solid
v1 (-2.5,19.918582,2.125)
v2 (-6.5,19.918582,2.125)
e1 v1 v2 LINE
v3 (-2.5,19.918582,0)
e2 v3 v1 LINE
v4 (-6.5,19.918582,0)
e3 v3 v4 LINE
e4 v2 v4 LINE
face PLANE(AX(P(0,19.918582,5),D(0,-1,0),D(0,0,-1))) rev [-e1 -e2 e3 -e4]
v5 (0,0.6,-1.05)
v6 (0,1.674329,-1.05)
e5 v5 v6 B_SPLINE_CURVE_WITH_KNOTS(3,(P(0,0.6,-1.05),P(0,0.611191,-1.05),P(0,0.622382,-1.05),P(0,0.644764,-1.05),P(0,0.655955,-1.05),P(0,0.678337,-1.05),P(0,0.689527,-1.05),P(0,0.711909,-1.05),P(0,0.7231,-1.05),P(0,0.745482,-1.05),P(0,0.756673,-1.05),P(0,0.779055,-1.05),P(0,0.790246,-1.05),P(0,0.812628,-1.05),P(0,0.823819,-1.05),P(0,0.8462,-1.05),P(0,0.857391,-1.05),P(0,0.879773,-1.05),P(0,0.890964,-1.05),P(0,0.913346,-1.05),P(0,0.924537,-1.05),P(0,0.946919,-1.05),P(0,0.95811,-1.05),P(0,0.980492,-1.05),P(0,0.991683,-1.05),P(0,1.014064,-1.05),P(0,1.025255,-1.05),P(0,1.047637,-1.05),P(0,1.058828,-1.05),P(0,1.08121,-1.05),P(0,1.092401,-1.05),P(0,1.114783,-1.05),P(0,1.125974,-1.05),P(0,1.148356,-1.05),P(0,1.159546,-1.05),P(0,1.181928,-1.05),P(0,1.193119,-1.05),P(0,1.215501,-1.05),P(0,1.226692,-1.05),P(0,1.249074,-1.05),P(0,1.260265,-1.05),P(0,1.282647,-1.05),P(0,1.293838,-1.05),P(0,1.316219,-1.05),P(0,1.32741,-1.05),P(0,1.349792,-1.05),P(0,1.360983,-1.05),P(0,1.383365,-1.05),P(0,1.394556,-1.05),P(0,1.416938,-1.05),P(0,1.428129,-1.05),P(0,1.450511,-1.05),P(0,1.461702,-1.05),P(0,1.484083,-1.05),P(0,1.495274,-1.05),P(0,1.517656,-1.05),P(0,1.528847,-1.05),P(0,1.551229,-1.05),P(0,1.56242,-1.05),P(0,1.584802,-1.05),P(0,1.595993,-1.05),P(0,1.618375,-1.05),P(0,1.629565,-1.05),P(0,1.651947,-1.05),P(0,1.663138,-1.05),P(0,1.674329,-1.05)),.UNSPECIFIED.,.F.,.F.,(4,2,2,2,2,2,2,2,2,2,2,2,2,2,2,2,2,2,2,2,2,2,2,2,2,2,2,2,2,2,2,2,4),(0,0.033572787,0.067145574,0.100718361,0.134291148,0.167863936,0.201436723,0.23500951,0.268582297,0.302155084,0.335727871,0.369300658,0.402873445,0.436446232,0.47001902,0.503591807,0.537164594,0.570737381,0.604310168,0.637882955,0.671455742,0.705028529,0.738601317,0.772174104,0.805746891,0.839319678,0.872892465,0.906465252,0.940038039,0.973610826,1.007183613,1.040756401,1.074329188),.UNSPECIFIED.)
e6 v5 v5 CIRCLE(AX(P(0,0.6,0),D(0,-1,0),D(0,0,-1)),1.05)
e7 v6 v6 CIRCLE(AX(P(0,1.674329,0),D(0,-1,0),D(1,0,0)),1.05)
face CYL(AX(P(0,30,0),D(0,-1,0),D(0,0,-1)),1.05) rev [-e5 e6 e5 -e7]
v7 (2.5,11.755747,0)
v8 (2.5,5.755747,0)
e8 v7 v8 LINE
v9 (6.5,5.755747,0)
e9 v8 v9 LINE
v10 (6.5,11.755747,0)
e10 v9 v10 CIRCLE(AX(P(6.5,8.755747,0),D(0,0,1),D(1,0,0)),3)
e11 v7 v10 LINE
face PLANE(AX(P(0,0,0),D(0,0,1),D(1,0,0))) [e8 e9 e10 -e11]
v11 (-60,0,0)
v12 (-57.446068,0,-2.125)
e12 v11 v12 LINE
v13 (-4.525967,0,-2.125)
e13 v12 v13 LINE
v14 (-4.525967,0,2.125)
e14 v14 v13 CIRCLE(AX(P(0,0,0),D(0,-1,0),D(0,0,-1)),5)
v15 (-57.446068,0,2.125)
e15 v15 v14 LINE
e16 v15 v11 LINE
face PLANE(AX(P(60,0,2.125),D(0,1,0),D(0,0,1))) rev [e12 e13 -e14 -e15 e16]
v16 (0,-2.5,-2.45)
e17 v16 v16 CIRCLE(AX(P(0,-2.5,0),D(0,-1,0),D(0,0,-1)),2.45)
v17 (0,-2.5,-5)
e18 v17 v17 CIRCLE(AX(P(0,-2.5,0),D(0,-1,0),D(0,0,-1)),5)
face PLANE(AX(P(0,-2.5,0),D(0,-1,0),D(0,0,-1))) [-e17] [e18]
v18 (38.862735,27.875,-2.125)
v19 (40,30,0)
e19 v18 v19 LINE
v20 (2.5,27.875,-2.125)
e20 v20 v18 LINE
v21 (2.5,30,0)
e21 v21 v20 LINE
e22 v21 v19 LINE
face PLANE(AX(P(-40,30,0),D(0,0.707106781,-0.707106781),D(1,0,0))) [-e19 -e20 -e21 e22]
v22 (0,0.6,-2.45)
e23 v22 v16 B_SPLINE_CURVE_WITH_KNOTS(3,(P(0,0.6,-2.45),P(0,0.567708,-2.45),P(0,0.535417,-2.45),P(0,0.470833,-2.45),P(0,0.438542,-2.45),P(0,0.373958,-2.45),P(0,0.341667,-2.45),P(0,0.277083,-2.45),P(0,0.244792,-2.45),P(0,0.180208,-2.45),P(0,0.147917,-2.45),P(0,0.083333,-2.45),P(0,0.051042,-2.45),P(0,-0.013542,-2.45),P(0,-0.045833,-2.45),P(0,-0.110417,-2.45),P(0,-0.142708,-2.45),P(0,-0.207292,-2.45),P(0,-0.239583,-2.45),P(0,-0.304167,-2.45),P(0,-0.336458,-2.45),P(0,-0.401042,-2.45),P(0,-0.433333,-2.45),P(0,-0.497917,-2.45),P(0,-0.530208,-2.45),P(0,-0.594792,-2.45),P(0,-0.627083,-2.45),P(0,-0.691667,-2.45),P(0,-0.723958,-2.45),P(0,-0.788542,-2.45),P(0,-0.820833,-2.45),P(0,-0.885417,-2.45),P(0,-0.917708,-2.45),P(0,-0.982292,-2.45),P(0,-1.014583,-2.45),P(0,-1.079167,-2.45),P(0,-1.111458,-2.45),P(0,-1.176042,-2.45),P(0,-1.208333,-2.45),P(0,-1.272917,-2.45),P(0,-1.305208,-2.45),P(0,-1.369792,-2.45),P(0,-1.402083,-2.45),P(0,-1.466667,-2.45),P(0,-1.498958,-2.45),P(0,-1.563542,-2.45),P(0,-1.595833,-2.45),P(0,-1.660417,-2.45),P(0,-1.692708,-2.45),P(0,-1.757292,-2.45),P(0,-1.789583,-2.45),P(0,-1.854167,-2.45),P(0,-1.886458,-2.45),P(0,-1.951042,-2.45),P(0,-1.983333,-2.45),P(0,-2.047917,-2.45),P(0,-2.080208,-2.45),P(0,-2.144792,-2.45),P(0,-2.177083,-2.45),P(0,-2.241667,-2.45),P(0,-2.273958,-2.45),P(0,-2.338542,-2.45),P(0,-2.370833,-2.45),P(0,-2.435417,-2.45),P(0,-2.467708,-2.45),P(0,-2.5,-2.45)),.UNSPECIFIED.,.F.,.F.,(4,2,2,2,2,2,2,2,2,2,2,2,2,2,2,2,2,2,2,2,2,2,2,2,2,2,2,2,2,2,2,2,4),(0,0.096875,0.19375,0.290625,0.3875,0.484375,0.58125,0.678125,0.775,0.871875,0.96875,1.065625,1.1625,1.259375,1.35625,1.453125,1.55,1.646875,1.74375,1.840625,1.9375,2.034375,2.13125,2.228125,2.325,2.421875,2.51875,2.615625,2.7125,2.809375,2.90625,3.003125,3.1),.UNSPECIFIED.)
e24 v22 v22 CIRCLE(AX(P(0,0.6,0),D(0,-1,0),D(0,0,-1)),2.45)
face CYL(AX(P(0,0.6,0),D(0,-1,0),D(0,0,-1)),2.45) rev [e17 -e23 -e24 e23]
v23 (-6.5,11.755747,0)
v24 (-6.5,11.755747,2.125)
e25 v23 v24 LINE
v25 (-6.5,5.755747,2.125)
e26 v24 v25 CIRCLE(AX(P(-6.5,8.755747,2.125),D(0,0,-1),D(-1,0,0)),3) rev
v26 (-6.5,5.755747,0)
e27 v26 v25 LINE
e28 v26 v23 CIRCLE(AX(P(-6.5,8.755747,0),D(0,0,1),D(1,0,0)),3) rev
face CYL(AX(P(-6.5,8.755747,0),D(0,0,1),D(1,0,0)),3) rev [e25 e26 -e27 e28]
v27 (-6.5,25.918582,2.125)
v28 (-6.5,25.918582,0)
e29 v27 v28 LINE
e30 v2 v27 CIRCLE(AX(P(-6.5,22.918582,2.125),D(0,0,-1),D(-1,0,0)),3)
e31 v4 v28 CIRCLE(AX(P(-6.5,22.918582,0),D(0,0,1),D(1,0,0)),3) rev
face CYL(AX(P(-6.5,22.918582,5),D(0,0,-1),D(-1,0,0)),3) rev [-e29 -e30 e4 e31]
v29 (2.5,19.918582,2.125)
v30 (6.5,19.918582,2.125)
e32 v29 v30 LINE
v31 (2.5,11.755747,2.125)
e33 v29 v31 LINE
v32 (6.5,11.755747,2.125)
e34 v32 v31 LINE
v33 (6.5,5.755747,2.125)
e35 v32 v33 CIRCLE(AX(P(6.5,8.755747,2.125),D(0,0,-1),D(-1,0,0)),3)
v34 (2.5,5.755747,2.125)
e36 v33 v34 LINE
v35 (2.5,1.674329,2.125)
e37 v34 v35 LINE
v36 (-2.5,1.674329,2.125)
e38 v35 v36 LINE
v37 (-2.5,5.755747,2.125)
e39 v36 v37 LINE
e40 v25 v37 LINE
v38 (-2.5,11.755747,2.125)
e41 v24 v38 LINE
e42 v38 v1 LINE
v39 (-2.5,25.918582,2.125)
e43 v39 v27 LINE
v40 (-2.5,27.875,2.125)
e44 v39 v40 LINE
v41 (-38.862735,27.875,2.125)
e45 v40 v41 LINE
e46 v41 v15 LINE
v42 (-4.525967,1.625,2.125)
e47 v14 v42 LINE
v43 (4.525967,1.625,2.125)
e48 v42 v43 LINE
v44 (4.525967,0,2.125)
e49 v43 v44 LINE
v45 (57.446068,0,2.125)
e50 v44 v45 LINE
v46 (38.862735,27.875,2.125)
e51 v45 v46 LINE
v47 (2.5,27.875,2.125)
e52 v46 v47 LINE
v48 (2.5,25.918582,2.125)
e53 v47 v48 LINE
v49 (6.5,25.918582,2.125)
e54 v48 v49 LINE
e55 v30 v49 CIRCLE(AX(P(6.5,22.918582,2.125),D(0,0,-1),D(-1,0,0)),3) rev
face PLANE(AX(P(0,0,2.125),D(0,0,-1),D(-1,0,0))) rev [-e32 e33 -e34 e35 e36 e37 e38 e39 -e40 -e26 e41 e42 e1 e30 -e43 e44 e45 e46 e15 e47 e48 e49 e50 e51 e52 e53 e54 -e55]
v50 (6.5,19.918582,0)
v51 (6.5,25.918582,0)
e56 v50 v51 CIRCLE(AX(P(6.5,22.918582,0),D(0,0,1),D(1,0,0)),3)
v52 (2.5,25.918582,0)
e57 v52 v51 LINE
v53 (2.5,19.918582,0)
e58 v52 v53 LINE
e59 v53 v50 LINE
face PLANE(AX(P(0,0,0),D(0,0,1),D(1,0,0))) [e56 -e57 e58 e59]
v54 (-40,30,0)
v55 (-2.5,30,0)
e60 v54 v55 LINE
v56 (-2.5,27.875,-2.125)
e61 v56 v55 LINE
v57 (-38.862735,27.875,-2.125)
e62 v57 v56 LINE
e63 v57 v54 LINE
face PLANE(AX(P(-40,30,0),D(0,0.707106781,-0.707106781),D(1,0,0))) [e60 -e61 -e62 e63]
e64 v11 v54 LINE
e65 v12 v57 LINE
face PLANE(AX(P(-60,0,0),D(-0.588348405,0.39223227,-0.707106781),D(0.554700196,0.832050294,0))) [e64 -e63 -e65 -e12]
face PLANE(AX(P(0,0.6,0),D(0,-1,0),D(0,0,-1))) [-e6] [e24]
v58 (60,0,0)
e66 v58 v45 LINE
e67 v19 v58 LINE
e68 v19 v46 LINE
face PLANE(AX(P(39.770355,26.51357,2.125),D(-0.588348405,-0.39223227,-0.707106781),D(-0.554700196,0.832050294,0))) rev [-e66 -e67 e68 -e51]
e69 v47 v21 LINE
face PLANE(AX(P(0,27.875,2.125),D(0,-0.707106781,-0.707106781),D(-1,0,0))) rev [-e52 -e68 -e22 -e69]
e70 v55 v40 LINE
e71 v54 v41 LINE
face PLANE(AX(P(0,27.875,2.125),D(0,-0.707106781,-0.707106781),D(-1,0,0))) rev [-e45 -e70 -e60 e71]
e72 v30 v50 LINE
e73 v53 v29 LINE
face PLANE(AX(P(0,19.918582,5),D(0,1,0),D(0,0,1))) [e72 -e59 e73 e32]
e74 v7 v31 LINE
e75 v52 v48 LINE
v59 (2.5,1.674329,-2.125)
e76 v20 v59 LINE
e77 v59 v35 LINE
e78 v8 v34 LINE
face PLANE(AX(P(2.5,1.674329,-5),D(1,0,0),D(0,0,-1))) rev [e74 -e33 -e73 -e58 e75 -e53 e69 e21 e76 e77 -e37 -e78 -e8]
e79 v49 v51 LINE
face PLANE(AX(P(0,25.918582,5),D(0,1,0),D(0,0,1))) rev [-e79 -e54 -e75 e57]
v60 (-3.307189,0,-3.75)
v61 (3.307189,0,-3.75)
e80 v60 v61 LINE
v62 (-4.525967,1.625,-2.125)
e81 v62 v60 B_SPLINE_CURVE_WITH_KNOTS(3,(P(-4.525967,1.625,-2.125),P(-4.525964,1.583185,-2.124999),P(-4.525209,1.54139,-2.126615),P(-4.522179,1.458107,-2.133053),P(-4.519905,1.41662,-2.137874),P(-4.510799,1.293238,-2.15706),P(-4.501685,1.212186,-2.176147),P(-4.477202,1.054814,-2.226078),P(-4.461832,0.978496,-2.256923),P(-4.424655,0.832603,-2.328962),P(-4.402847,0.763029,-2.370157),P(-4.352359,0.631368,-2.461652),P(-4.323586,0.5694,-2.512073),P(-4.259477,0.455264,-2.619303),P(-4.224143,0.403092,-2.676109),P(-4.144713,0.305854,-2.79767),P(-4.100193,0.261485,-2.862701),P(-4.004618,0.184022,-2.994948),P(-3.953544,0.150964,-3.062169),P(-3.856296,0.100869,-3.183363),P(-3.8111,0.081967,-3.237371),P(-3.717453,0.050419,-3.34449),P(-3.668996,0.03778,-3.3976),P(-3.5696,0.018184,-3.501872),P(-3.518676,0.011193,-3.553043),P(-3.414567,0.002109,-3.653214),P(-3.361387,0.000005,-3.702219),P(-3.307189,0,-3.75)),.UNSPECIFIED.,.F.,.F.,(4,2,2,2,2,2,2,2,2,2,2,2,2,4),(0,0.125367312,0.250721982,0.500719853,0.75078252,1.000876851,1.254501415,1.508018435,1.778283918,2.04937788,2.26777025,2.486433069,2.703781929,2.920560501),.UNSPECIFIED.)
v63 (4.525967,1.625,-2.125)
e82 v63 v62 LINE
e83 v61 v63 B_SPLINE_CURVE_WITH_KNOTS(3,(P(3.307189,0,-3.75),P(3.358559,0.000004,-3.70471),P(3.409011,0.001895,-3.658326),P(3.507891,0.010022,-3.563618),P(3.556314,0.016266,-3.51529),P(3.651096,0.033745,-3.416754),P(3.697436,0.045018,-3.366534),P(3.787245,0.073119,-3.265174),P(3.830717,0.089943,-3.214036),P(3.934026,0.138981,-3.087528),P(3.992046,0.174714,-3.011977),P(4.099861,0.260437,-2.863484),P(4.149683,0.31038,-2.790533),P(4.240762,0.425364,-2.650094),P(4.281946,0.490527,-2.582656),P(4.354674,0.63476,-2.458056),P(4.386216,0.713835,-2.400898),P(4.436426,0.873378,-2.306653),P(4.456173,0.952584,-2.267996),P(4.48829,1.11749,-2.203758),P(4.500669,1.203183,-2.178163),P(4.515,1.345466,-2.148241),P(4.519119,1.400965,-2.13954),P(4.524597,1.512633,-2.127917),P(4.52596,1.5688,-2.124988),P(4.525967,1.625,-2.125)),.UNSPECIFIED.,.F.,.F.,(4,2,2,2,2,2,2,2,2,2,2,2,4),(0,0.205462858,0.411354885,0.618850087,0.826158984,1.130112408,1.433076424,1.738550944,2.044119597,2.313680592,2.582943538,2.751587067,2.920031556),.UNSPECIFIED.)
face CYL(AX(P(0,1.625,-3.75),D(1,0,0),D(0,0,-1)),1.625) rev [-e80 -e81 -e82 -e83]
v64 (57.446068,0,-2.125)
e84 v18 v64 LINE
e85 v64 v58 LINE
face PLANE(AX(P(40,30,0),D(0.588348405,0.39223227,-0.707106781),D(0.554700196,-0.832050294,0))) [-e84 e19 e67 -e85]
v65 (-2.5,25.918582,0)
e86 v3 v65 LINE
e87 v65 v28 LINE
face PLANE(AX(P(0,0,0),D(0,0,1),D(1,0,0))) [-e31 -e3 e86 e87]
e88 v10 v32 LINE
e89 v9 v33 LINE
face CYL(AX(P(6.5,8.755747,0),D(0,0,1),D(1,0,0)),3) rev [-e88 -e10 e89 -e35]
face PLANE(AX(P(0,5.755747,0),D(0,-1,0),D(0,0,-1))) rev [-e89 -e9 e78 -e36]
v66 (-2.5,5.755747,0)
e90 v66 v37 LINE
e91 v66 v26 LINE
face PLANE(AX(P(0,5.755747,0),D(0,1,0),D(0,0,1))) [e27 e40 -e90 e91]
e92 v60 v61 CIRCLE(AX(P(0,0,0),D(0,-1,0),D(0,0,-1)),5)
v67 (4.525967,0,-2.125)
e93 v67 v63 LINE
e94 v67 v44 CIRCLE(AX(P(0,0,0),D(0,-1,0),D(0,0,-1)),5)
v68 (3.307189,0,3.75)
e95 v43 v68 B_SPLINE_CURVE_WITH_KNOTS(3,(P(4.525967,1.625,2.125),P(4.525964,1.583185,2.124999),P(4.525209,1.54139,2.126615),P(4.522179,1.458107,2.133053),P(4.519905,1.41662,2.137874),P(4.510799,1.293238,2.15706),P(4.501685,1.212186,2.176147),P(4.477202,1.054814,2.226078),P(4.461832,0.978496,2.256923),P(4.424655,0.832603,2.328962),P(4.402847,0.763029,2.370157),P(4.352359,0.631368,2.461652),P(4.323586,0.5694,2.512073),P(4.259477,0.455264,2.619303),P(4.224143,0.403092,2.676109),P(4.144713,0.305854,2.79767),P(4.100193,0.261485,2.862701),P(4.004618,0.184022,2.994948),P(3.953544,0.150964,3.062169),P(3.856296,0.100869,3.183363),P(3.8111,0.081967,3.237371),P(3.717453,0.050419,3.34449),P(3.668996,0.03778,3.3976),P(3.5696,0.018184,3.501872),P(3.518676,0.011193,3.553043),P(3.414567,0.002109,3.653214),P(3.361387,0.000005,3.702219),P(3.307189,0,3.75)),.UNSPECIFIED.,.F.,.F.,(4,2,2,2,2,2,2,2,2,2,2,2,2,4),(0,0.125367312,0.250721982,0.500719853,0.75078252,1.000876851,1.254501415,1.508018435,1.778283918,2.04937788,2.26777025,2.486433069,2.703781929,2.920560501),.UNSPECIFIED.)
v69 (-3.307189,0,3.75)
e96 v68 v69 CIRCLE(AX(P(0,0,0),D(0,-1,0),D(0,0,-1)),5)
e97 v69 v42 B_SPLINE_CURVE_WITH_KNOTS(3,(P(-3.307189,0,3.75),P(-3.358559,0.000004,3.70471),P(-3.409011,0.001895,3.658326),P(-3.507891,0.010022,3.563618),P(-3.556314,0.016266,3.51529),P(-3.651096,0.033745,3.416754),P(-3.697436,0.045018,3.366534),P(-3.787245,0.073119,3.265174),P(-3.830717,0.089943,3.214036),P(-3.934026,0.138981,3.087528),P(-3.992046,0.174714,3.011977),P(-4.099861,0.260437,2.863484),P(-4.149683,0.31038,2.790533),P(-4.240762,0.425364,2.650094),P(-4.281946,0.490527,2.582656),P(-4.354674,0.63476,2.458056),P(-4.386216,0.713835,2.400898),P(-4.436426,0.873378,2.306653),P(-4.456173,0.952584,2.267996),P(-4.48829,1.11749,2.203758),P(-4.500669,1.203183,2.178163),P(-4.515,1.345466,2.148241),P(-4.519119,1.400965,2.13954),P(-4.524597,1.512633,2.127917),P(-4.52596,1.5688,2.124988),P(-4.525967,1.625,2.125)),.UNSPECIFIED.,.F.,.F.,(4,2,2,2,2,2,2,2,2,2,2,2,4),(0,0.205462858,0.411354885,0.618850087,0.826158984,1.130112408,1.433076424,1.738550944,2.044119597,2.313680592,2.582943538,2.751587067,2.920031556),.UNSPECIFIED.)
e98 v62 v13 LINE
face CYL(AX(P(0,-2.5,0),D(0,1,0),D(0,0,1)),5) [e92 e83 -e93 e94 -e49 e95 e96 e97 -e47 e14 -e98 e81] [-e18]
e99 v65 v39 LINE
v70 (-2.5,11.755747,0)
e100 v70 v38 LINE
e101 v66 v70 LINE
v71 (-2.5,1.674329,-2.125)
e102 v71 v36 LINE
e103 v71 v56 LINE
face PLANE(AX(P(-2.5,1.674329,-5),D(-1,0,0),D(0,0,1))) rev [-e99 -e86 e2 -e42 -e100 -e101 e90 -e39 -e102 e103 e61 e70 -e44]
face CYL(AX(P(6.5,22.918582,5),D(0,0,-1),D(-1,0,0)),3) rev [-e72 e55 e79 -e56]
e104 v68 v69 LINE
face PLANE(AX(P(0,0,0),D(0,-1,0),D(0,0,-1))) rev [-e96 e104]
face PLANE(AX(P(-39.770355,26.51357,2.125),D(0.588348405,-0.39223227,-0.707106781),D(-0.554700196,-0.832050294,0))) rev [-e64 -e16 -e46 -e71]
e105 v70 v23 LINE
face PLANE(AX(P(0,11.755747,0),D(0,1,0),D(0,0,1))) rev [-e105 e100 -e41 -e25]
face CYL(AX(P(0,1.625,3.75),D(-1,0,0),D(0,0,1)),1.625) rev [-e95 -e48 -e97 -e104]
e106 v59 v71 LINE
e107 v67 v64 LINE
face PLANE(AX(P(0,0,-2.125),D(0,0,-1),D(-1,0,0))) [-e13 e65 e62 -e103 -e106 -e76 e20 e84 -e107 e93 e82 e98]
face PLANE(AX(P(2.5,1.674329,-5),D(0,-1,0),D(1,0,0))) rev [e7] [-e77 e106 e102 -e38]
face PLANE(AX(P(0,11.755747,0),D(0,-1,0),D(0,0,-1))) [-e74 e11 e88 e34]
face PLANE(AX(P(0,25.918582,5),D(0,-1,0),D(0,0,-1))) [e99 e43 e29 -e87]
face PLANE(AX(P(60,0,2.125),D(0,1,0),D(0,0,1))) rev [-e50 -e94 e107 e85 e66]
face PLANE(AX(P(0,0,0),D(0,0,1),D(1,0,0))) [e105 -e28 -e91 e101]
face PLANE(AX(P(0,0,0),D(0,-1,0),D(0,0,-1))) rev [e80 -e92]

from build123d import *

# Parameters (mm, degrees)
SALIENTE_EXTRUIR1_DEPTH = 2.125
CROQUIS2_R              = 5
SALIENTE_EXTRUIR2_DEPTH = 2.5
REDONDEO1_R             = 1.625
SKETCH1_R               = 2.45
CUT_EXTRUDE1_DEPTH      = 3.1
CHAMFER1_SIZE           = 2.125
CUT_EXTRUDE2_DEPTH      = 68.459362768
CUT_EXTRUDE2_DEPTH_BACK = 68.459362768
SKETCH2_W               = 5
SKETCH2_H               = 28.351341624
CUT_EXTRUDE3_DEPTH      = 68.002686513
CUT_EXTRUDE3_DEPTH_BACK = 68.002686513
SKETCH3_R               = 1.05
CUT_EXTRUDE4_DEPTH      = 68.459362768
CUT_EXTRUDE4_DEPTH_BACK = 2.125


# Some blends are built 0.0001 mm under size
with BuildPart() as part:
    # Croquis1 → Saliente-Extruir1 (new, symmetric)
    with BuildSketch(Plane.XY):
        Polygon((60, 0), (-60, 0), (-40, 30), (40, 30), align=None)
    extrude(amount=SALIENTE_EXTRUIR1_DEPTH, both=True)

    # Croquis2 → Saliente-Extruir2 (add)
    with BuildSketch(Plane.XZ):
        with Locations(Location((0, 0, 0), (0, 0, 25.150663413))):
            Circle(CROQUIS2_R)
    extrude(amount=SALIENTE_EXTRUIR2_DEPTH)

    # Redondeo1
    # the kernel refuses this fillet: 1.625 mm, written as the material it adds along each edge
    with BuildSketch(Plane(origin=(8.588466748, 0, -2.125), x_dir=(0, 1, 0), z_dir=(-1, 0, 0))) as redondeo1_piece_1_section:
        with BuildLine():
            CenterArc((REDONDEO1_R, REDONDEO1_R), REDONDEO1_R, 180, 90)
            Line((0, REDONDEO1_R), (0, 0))
            Line((0, 0), (REDONDEO1_R, 0))
        make_face()
    redondeo1_piece_1 = extrude(amount=17.176933495, mode=Mode.PRIVATE)
    redondeo1_piece_1 = redondeo1_piece_1 & Plane(origin=(0, 0.370660795, 0), x_dir=(0.9051933495081991, 0, 0.4250000000072087), z_dir=(0, 1, 0)) * Cylinder(5, 41, mode=Mode.PRIVATE)
    add(redondeo1_piece_1)
    with BuildSketch(Plane(origin=(8.588466748, 0, 2.125), x_dir=(0, 1, 0), z_dir=(-1, 0, 0))) as redondeo1_piece_2_section:
        with BuildLine():
            CenterArc((REDONDEO1_R, -REDONDEO1_R), REDONDEO1_R, 90, 90)
            Line((0, -REDONDEO1_R), (0, 0))
            Line((0, 0), (REDONDEO1_R, 0))
        make_face()
    redondeo1_piece_2 = extrude(amount=17.176933495, mode=Mode.PRIVATE)
    redondeo1_piece_2 = redondeo1_piece_2 & Plane(origin=(0, 0.370660827, 0), x_dir=(0.9051933495081991, 0, 0.4250000000072087), z_dir=(0, 1, 0)) * Cylinder(5, 41, mode=Mode.PRIVATE)
    add(redondeo1_piece_2)

    # Sketch1 → Cut-Extrude1 (cut)
    with BuildSketch(Plane.XZ.offset(2.5)):
        with Locations(Location((0, 0, 0), (0, 0, 270))):
            Circle(SKETCH1_R)
    extrude(amount=-CUT_EXTRUDE1_DEPTH, mode=Mode.SUBTRACT)

    # Chamfer1
    chamfer1_edges = [part.edges().sort_by_distance(p)[0] for p in [
        (50, 15, -2.125),
        (0, 30, -2.125),
        (-50, 15, -2.125),
        (50, 15, 2.125),
        (0, 30, 2.125),
        (-50, 15, 2.125),
    ]]
    chamfer(chamfer1_edges, length=CHAMFER1_SIZE - 0.0001)  # a hair under: the kernel refuses the full size

    # Sketch2 → Cut-Extrude2 (cut, two sides: drawn at the far end of the back side and taken through both)
    with BuildSketch(Plane.XY.offset(2.125).offset(-CUT_EXTRUDE2_DEPTH_BACK)):
        with Locations((0, 15.85)):
            Rectangle(SKETCH2_W, SKETCH2_H)
    extrude(amount=CUT_EXTRUDE2_DEPTH + CUT_EXTRUDE2_DEPTH_BACK, mode=Mode.SUBTRACT)

    # Sketch3 → Cut-Extrude3 (cut, two sides: drawn at the far end of the back side and taken through both)
    with BuildSketch(Plane.XZ.offset(-0.6).offset(-CUT_EXTRUDE3_DEPTH_BACK)):
        with Locations(Location((0, 0, 0), (0, 0, 270))):
            Circle(SKETCH3_R)
    extrude(amount=CUT_EXTRUDE3_DEPTH + CUT_EXTRUDE3_DEPTH_BACK, mode=Mode.SUBTRACT)

    # Sketch4 → Cut-Extrude4 (cut, two sides: drawn at the far end of the back side and taken through both)
    with BuildSketch(Plane.XY.offset(2.125).offset(-CUT_EXTRUDE4_DEPTH_BACK)):
        with BuildLine():
            Line((2.5, 25.918582297), (2.5, 19.918582297))
            Line((2.5, 19.918582297), (6.5, 19.918582297))
            ThreePointArc((6.5, 19.918582297), (9.5, 22.918582297), (6.5, 25.918582297))
            Line((6.5, 25.918582297), (2.5, 25.918582297))
        make_face()
        with BuildLine():
            Line((6.5, 11.755746891), (2.5, 11.755746891))
            Line((2.5, 11.755746891), (2.5, 5.755746891))
            Line((2.5, 5.755746891), (6.5, 5.755746891))
            ThreePointArc((6.5, 5.755746891), (9.5, 8.755746891), (6.5, 11.755746891))
        make_face()
        with BuildLine():
            Line((-6.5, 19.918582297), (-2.5, 19.918582297))
            Line((-2.5, 19.918582297), (-2.5, 25.918582297))
            Line((-2.5, 25.918582297), (-6.5, 25.918582297))
            ThreePointArc((-6.5, 25.918582297), (-9.5, 22.918582297), (-6.5, 19.918582297))
        make_face()
        with BuildLine():
            Line((-2.5, 5.755746891), (-2.5, 11.755746891))
            Line((-2.5, 11.755746891), (-6.5, 11.755746891))
            ThreePointArc((-6.5, 11.755746891), (-9.5, 8.755746891), (-6.5, 5.755746891))
            Line((-6.5, 5.755746891), (-2.5, 5.755746891))
        make_face()
    extrude(amount=CUT_EXTRUDE4_DEPTH + CUT_EXTRUDE4_DEPTH_BACK, mode=Mode.SUBTRACT)


solid = part.part
